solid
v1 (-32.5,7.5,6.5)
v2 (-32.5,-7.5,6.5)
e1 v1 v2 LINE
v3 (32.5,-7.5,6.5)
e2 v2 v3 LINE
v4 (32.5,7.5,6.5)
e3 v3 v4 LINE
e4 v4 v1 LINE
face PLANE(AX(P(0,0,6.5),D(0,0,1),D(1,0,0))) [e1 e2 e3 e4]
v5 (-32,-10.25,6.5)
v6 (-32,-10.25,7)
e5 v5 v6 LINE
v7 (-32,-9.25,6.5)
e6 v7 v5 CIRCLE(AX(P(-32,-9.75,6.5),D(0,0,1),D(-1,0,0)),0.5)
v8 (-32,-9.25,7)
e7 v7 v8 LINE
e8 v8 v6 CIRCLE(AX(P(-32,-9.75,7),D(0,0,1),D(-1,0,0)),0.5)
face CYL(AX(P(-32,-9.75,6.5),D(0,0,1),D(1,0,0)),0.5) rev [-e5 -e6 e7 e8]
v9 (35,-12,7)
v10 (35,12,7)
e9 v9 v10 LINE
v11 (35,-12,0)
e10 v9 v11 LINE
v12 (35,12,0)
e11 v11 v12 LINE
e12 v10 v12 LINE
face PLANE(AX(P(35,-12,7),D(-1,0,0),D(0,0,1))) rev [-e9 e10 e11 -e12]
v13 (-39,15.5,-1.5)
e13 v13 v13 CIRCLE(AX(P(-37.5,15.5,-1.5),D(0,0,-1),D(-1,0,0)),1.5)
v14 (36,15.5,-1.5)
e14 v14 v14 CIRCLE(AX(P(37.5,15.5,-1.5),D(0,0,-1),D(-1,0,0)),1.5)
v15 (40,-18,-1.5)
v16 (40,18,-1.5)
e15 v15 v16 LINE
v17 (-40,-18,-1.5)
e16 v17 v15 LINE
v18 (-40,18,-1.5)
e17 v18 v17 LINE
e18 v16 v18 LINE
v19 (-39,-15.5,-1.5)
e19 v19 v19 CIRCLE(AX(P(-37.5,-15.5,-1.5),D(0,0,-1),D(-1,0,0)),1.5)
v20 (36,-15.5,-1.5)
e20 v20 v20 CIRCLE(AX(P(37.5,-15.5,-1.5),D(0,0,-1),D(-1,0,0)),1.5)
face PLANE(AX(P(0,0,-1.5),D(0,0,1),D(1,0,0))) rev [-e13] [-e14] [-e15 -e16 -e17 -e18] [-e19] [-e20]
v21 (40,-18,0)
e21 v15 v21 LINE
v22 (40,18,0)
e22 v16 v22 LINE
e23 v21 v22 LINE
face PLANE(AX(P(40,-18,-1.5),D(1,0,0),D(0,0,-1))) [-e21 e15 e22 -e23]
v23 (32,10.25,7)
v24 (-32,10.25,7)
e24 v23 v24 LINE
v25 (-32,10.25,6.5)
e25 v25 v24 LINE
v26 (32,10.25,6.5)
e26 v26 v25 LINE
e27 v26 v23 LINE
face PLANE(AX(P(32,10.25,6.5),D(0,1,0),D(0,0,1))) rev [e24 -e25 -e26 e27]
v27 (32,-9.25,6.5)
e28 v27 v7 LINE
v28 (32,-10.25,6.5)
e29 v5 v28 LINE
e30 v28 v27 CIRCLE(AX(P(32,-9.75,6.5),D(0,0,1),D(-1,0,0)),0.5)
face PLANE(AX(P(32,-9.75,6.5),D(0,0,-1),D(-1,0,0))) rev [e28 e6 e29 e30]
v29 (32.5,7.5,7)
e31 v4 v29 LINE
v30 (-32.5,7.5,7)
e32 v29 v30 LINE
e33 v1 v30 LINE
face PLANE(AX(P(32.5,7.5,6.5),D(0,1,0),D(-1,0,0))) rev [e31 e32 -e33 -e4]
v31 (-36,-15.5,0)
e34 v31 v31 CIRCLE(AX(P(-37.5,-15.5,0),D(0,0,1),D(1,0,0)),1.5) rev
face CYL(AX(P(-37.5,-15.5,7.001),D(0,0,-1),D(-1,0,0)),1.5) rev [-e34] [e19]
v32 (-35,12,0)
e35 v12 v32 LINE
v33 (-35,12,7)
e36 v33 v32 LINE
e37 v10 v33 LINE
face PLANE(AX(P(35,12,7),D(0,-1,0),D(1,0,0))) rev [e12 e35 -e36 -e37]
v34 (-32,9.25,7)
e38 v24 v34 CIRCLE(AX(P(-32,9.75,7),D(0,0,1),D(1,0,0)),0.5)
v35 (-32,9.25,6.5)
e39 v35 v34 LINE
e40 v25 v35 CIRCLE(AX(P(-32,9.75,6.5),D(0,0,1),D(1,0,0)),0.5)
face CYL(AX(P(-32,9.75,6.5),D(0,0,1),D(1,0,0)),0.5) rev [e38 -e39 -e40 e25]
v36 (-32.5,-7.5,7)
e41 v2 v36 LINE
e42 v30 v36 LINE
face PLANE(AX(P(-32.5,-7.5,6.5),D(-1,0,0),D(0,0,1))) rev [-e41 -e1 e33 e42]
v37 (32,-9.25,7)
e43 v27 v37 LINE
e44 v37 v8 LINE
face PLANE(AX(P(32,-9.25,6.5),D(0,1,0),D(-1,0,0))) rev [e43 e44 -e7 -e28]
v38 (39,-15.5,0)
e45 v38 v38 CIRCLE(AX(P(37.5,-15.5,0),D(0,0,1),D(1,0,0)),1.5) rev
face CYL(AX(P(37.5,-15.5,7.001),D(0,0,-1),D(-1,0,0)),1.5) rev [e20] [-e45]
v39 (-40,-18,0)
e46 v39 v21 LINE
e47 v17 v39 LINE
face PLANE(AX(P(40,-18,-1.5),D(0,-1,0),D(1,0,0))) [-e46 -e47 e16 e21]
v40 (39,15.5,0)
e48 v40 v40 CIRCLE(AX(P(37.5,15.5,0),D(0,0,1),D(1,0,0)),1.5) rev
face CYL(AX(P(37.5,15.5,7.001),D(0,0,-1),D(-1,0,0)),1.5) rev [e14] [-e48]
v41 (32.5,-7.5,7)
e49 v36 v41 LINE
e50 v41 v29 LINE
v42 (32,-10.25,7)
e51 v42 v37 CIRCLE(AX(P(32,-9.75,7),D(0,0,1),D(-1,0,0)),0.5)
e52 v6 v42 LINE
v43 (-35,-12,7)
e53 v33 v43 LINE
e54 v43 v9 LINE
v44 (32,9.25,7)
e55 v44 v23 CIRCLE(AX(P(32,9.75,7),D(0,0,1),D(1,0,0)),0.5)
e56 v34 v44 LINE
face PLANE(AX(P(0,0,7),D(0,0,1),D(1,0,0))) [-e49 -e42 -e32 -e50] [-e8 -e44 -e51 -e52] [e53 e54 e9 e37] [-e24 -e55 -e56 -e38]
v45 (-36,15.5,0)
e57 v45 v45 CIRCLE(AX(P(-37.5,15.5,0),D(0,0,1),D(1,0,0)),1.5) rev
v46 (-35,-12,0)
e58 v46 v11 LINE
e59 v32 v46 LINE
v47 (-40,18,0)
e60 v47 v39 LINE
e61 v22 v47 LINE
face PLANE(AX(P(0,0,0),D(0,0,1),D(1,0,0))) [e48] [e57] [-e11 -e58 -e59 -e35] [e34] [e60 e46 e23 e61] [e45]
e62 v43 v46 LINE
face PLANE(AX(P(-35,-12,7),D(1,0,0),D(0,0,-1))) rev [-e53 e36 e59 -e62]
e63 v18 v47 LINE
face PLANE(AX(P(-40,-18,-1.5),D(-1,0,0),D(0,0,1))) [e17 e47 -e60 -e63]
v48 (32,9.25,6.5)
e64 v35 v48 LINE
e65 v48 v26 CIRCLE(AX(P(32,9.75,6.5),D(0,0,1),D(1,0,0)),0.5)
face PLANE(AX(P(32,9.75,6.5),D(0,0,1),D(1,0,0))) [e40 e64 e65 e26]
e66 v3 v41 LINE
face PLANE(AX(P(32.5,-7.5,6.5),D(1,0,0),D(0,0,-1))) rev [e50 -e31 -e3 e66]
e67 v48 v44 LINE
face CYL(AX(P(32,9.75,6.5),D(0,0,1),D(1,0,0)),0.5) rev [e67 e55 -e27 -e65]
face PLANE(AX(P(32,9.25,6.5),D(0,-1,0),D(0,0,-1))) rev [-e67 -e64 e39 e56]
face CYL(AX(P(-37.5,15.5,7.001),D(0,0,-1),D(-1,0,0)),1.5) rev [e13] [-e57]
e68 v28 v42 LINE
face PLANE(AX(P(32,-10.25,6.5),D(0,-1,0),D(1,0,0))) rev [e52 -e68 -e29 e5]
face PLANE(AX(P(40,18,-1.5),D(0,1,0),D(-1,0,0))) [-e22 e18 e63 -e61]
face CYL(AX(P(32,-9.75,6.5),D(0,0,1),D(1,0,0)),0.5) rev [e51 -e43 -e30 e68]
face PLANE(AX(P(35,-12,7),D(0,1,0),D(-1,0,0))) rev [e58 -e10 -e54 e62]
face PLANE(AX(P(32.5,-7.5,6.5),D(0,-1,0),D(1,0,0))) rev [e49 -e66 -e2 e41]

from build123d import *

# Parameters (mm, degrees)
SKETCH1_W           = 80
SKETCH1_H           = 36
BASE_FLANGE1_DEPTH  = 1.5
SKETCH6_W           = 70
SKETCH6_H           = 24
BOSS_EXTRUDE1_DEPTH = 7
SKETCH7_W           = 65
SKETCH7_H           = 15
CUT_EXTRUDE1_DEPTH  = 0.5
CUT_EXTRUDE2_DEPTH  = 0.5
CUT_EXTRUDE3_REACH  = 46.679
SKETCH9_R           = 1.5


# Sheet-metal steps are written as plain solids
with BuildPart() as part:
    # Sketch1 → Base-Flange1 (new body)
    with BuildSketch(Plane.XY):
        Rectangle(SKETCH1_W, SKETCH1_H)
    extrude(amount=-BASE_FLANGE1_DEPTH)

    # Sketch6 → Boss-Extrude1 (add)
    with BuildSketch(Plane.XY):
        Rectangle(SKETCH6_W, SKETCH6_H)
    extrude(amount=BOSS_EXTRUDE1_DEPTH)

    # Sketch7 → Cut-Extrude1 (cut)
    with BuildSketch(Plane.XY.offset(7)):
        Rectangle(SKETCH7_W, SKETCH7_H)
    extrude(amount=-CUT_EXTRUDE1_DEPTH, mode=Mode.SUBTRACT)

    # Sketch8 → Cut-Extrude2 (cut)
    with BuildSketch(Plane.XY.offset(7)):
        with BuildLine():
            Line((32, 9.25), (-32, 9.25))
            ThreePointArc((-32, 9.25), (-32.5, 9.75), (-32, 10.25))
            Line((-32, 10.25), (32, 10.25))
            ThreePointArc((32, 10.25), (32.5, 9.75), (32, 9.25))
        make_face()
        with BuildLine():
            Line((32, -9.25), (-32, -9.25))
            ThreePointArc((-32, -9.25), (-32.5, -9.75), (-32, -10.25))
            Line((-32, -10.25), (32, -10.25))
            ThreePointArc((32, -10.25), (32.5, -9.75), (32, -9.25))
        make_face()
    extrude(amount=-CUT_EXTRUDE2_DEPTH, mode=Mode.SUBTRACT)

    # Sketch9 → Cut-Extrude3 (cut, up to next)
    with BuildSketch(Plane(origin=(0, 0, -1.5), x_dir=(-1, 0, 0), z_dir=(0, 0, -1)), mode=Mode.PRIVATE) as cut_extrude3_sk1:
        with Locations((-37.5, 15.5)):
            Circle(SKETCH9_R)
    cut_extrude3_tool1 = extrude(cut_extrude3_sk1.sketch, amount=-CUT_EXTRUDE3_REACH, mode=Mode.PRIVATE) & part.part
    # Sketch9 → Cut-Extrude3 (cut, up to next)
    with BuildSketch(Plane(origin=(0, 0, -1.5), x_dir=(-1, 0, 0), z_dir=(0, 0, -1)), mode=Mode.PRIVATE) as cut_extrude3_sk2:
        with Locations((-37.5, -15.5)):
            Circle(SKETCH9_R)
    cut_extrude3_tool2 = extrude(cut_extrude3_sk2.sketch, amount=-CUT_EXTRUDE3_REACH, mode=Mode.PRIVATE) & part.part
    # Sketch9 → Cut-Extrude3 (cut, up to next)
    with BuildSketch(Plane(origin=(0, 0, -1.5), x_dir=(-1, 0, 0), z_dir=(0, 0, -1)), mode=Mode.PRIVATE) as cut_extrude3_sk3:
        with Locations((37.5, 15.5)):
            Circle(SKETCH9_R)
    cut_extrude3_tool3 = extrude(cut_extrude3_sk3.sketch, amount=-CUT_EXTRUDE3_REACH, mode=Mode.PRIVATE) & part.part
    # Sketch9 → Cut-Extrude3 (cut, up to next)
    with BuildSketch(Plane(origin=(0, 0, -1.5), x_dir=(-1, 0, 0), z_dir=(0, 0, -1)), mode=Mode.PRIVATE) as cut_extrude3_sk4:
        with Locations((37.5, -15.5)):
            Circle(SKETCH9_R)
    cut_extrude3_tool4 = extrude(cut_extrude3_sk4.sketch, amount=-CUT_EXTRUDE3_REACH, mode=Mode.PRIVATE) & part.part
    add(cut_extrude3_tool1.solids().sort_by_distance((37.5, 15.5, -1.5))[0], mode=Mode.SUBTRACT)
    add(cut_extrude3_tool2.solids().sort_by_distance((37.5, -15.5, -1.5))[0], mode=Mode.SUBTRACT)
    add(cut_extrude3_tool3.solids().sort_by_distance((-37.5, 15.5, -1.5))[0], mode=Mode.SUBTRACT)
    add(cut_extrude3_tool4.solids().sort_by_distance((-37.5, -15.5, -1.5))[0], mode=Mode.SUBTRACT)


solid = part.part
